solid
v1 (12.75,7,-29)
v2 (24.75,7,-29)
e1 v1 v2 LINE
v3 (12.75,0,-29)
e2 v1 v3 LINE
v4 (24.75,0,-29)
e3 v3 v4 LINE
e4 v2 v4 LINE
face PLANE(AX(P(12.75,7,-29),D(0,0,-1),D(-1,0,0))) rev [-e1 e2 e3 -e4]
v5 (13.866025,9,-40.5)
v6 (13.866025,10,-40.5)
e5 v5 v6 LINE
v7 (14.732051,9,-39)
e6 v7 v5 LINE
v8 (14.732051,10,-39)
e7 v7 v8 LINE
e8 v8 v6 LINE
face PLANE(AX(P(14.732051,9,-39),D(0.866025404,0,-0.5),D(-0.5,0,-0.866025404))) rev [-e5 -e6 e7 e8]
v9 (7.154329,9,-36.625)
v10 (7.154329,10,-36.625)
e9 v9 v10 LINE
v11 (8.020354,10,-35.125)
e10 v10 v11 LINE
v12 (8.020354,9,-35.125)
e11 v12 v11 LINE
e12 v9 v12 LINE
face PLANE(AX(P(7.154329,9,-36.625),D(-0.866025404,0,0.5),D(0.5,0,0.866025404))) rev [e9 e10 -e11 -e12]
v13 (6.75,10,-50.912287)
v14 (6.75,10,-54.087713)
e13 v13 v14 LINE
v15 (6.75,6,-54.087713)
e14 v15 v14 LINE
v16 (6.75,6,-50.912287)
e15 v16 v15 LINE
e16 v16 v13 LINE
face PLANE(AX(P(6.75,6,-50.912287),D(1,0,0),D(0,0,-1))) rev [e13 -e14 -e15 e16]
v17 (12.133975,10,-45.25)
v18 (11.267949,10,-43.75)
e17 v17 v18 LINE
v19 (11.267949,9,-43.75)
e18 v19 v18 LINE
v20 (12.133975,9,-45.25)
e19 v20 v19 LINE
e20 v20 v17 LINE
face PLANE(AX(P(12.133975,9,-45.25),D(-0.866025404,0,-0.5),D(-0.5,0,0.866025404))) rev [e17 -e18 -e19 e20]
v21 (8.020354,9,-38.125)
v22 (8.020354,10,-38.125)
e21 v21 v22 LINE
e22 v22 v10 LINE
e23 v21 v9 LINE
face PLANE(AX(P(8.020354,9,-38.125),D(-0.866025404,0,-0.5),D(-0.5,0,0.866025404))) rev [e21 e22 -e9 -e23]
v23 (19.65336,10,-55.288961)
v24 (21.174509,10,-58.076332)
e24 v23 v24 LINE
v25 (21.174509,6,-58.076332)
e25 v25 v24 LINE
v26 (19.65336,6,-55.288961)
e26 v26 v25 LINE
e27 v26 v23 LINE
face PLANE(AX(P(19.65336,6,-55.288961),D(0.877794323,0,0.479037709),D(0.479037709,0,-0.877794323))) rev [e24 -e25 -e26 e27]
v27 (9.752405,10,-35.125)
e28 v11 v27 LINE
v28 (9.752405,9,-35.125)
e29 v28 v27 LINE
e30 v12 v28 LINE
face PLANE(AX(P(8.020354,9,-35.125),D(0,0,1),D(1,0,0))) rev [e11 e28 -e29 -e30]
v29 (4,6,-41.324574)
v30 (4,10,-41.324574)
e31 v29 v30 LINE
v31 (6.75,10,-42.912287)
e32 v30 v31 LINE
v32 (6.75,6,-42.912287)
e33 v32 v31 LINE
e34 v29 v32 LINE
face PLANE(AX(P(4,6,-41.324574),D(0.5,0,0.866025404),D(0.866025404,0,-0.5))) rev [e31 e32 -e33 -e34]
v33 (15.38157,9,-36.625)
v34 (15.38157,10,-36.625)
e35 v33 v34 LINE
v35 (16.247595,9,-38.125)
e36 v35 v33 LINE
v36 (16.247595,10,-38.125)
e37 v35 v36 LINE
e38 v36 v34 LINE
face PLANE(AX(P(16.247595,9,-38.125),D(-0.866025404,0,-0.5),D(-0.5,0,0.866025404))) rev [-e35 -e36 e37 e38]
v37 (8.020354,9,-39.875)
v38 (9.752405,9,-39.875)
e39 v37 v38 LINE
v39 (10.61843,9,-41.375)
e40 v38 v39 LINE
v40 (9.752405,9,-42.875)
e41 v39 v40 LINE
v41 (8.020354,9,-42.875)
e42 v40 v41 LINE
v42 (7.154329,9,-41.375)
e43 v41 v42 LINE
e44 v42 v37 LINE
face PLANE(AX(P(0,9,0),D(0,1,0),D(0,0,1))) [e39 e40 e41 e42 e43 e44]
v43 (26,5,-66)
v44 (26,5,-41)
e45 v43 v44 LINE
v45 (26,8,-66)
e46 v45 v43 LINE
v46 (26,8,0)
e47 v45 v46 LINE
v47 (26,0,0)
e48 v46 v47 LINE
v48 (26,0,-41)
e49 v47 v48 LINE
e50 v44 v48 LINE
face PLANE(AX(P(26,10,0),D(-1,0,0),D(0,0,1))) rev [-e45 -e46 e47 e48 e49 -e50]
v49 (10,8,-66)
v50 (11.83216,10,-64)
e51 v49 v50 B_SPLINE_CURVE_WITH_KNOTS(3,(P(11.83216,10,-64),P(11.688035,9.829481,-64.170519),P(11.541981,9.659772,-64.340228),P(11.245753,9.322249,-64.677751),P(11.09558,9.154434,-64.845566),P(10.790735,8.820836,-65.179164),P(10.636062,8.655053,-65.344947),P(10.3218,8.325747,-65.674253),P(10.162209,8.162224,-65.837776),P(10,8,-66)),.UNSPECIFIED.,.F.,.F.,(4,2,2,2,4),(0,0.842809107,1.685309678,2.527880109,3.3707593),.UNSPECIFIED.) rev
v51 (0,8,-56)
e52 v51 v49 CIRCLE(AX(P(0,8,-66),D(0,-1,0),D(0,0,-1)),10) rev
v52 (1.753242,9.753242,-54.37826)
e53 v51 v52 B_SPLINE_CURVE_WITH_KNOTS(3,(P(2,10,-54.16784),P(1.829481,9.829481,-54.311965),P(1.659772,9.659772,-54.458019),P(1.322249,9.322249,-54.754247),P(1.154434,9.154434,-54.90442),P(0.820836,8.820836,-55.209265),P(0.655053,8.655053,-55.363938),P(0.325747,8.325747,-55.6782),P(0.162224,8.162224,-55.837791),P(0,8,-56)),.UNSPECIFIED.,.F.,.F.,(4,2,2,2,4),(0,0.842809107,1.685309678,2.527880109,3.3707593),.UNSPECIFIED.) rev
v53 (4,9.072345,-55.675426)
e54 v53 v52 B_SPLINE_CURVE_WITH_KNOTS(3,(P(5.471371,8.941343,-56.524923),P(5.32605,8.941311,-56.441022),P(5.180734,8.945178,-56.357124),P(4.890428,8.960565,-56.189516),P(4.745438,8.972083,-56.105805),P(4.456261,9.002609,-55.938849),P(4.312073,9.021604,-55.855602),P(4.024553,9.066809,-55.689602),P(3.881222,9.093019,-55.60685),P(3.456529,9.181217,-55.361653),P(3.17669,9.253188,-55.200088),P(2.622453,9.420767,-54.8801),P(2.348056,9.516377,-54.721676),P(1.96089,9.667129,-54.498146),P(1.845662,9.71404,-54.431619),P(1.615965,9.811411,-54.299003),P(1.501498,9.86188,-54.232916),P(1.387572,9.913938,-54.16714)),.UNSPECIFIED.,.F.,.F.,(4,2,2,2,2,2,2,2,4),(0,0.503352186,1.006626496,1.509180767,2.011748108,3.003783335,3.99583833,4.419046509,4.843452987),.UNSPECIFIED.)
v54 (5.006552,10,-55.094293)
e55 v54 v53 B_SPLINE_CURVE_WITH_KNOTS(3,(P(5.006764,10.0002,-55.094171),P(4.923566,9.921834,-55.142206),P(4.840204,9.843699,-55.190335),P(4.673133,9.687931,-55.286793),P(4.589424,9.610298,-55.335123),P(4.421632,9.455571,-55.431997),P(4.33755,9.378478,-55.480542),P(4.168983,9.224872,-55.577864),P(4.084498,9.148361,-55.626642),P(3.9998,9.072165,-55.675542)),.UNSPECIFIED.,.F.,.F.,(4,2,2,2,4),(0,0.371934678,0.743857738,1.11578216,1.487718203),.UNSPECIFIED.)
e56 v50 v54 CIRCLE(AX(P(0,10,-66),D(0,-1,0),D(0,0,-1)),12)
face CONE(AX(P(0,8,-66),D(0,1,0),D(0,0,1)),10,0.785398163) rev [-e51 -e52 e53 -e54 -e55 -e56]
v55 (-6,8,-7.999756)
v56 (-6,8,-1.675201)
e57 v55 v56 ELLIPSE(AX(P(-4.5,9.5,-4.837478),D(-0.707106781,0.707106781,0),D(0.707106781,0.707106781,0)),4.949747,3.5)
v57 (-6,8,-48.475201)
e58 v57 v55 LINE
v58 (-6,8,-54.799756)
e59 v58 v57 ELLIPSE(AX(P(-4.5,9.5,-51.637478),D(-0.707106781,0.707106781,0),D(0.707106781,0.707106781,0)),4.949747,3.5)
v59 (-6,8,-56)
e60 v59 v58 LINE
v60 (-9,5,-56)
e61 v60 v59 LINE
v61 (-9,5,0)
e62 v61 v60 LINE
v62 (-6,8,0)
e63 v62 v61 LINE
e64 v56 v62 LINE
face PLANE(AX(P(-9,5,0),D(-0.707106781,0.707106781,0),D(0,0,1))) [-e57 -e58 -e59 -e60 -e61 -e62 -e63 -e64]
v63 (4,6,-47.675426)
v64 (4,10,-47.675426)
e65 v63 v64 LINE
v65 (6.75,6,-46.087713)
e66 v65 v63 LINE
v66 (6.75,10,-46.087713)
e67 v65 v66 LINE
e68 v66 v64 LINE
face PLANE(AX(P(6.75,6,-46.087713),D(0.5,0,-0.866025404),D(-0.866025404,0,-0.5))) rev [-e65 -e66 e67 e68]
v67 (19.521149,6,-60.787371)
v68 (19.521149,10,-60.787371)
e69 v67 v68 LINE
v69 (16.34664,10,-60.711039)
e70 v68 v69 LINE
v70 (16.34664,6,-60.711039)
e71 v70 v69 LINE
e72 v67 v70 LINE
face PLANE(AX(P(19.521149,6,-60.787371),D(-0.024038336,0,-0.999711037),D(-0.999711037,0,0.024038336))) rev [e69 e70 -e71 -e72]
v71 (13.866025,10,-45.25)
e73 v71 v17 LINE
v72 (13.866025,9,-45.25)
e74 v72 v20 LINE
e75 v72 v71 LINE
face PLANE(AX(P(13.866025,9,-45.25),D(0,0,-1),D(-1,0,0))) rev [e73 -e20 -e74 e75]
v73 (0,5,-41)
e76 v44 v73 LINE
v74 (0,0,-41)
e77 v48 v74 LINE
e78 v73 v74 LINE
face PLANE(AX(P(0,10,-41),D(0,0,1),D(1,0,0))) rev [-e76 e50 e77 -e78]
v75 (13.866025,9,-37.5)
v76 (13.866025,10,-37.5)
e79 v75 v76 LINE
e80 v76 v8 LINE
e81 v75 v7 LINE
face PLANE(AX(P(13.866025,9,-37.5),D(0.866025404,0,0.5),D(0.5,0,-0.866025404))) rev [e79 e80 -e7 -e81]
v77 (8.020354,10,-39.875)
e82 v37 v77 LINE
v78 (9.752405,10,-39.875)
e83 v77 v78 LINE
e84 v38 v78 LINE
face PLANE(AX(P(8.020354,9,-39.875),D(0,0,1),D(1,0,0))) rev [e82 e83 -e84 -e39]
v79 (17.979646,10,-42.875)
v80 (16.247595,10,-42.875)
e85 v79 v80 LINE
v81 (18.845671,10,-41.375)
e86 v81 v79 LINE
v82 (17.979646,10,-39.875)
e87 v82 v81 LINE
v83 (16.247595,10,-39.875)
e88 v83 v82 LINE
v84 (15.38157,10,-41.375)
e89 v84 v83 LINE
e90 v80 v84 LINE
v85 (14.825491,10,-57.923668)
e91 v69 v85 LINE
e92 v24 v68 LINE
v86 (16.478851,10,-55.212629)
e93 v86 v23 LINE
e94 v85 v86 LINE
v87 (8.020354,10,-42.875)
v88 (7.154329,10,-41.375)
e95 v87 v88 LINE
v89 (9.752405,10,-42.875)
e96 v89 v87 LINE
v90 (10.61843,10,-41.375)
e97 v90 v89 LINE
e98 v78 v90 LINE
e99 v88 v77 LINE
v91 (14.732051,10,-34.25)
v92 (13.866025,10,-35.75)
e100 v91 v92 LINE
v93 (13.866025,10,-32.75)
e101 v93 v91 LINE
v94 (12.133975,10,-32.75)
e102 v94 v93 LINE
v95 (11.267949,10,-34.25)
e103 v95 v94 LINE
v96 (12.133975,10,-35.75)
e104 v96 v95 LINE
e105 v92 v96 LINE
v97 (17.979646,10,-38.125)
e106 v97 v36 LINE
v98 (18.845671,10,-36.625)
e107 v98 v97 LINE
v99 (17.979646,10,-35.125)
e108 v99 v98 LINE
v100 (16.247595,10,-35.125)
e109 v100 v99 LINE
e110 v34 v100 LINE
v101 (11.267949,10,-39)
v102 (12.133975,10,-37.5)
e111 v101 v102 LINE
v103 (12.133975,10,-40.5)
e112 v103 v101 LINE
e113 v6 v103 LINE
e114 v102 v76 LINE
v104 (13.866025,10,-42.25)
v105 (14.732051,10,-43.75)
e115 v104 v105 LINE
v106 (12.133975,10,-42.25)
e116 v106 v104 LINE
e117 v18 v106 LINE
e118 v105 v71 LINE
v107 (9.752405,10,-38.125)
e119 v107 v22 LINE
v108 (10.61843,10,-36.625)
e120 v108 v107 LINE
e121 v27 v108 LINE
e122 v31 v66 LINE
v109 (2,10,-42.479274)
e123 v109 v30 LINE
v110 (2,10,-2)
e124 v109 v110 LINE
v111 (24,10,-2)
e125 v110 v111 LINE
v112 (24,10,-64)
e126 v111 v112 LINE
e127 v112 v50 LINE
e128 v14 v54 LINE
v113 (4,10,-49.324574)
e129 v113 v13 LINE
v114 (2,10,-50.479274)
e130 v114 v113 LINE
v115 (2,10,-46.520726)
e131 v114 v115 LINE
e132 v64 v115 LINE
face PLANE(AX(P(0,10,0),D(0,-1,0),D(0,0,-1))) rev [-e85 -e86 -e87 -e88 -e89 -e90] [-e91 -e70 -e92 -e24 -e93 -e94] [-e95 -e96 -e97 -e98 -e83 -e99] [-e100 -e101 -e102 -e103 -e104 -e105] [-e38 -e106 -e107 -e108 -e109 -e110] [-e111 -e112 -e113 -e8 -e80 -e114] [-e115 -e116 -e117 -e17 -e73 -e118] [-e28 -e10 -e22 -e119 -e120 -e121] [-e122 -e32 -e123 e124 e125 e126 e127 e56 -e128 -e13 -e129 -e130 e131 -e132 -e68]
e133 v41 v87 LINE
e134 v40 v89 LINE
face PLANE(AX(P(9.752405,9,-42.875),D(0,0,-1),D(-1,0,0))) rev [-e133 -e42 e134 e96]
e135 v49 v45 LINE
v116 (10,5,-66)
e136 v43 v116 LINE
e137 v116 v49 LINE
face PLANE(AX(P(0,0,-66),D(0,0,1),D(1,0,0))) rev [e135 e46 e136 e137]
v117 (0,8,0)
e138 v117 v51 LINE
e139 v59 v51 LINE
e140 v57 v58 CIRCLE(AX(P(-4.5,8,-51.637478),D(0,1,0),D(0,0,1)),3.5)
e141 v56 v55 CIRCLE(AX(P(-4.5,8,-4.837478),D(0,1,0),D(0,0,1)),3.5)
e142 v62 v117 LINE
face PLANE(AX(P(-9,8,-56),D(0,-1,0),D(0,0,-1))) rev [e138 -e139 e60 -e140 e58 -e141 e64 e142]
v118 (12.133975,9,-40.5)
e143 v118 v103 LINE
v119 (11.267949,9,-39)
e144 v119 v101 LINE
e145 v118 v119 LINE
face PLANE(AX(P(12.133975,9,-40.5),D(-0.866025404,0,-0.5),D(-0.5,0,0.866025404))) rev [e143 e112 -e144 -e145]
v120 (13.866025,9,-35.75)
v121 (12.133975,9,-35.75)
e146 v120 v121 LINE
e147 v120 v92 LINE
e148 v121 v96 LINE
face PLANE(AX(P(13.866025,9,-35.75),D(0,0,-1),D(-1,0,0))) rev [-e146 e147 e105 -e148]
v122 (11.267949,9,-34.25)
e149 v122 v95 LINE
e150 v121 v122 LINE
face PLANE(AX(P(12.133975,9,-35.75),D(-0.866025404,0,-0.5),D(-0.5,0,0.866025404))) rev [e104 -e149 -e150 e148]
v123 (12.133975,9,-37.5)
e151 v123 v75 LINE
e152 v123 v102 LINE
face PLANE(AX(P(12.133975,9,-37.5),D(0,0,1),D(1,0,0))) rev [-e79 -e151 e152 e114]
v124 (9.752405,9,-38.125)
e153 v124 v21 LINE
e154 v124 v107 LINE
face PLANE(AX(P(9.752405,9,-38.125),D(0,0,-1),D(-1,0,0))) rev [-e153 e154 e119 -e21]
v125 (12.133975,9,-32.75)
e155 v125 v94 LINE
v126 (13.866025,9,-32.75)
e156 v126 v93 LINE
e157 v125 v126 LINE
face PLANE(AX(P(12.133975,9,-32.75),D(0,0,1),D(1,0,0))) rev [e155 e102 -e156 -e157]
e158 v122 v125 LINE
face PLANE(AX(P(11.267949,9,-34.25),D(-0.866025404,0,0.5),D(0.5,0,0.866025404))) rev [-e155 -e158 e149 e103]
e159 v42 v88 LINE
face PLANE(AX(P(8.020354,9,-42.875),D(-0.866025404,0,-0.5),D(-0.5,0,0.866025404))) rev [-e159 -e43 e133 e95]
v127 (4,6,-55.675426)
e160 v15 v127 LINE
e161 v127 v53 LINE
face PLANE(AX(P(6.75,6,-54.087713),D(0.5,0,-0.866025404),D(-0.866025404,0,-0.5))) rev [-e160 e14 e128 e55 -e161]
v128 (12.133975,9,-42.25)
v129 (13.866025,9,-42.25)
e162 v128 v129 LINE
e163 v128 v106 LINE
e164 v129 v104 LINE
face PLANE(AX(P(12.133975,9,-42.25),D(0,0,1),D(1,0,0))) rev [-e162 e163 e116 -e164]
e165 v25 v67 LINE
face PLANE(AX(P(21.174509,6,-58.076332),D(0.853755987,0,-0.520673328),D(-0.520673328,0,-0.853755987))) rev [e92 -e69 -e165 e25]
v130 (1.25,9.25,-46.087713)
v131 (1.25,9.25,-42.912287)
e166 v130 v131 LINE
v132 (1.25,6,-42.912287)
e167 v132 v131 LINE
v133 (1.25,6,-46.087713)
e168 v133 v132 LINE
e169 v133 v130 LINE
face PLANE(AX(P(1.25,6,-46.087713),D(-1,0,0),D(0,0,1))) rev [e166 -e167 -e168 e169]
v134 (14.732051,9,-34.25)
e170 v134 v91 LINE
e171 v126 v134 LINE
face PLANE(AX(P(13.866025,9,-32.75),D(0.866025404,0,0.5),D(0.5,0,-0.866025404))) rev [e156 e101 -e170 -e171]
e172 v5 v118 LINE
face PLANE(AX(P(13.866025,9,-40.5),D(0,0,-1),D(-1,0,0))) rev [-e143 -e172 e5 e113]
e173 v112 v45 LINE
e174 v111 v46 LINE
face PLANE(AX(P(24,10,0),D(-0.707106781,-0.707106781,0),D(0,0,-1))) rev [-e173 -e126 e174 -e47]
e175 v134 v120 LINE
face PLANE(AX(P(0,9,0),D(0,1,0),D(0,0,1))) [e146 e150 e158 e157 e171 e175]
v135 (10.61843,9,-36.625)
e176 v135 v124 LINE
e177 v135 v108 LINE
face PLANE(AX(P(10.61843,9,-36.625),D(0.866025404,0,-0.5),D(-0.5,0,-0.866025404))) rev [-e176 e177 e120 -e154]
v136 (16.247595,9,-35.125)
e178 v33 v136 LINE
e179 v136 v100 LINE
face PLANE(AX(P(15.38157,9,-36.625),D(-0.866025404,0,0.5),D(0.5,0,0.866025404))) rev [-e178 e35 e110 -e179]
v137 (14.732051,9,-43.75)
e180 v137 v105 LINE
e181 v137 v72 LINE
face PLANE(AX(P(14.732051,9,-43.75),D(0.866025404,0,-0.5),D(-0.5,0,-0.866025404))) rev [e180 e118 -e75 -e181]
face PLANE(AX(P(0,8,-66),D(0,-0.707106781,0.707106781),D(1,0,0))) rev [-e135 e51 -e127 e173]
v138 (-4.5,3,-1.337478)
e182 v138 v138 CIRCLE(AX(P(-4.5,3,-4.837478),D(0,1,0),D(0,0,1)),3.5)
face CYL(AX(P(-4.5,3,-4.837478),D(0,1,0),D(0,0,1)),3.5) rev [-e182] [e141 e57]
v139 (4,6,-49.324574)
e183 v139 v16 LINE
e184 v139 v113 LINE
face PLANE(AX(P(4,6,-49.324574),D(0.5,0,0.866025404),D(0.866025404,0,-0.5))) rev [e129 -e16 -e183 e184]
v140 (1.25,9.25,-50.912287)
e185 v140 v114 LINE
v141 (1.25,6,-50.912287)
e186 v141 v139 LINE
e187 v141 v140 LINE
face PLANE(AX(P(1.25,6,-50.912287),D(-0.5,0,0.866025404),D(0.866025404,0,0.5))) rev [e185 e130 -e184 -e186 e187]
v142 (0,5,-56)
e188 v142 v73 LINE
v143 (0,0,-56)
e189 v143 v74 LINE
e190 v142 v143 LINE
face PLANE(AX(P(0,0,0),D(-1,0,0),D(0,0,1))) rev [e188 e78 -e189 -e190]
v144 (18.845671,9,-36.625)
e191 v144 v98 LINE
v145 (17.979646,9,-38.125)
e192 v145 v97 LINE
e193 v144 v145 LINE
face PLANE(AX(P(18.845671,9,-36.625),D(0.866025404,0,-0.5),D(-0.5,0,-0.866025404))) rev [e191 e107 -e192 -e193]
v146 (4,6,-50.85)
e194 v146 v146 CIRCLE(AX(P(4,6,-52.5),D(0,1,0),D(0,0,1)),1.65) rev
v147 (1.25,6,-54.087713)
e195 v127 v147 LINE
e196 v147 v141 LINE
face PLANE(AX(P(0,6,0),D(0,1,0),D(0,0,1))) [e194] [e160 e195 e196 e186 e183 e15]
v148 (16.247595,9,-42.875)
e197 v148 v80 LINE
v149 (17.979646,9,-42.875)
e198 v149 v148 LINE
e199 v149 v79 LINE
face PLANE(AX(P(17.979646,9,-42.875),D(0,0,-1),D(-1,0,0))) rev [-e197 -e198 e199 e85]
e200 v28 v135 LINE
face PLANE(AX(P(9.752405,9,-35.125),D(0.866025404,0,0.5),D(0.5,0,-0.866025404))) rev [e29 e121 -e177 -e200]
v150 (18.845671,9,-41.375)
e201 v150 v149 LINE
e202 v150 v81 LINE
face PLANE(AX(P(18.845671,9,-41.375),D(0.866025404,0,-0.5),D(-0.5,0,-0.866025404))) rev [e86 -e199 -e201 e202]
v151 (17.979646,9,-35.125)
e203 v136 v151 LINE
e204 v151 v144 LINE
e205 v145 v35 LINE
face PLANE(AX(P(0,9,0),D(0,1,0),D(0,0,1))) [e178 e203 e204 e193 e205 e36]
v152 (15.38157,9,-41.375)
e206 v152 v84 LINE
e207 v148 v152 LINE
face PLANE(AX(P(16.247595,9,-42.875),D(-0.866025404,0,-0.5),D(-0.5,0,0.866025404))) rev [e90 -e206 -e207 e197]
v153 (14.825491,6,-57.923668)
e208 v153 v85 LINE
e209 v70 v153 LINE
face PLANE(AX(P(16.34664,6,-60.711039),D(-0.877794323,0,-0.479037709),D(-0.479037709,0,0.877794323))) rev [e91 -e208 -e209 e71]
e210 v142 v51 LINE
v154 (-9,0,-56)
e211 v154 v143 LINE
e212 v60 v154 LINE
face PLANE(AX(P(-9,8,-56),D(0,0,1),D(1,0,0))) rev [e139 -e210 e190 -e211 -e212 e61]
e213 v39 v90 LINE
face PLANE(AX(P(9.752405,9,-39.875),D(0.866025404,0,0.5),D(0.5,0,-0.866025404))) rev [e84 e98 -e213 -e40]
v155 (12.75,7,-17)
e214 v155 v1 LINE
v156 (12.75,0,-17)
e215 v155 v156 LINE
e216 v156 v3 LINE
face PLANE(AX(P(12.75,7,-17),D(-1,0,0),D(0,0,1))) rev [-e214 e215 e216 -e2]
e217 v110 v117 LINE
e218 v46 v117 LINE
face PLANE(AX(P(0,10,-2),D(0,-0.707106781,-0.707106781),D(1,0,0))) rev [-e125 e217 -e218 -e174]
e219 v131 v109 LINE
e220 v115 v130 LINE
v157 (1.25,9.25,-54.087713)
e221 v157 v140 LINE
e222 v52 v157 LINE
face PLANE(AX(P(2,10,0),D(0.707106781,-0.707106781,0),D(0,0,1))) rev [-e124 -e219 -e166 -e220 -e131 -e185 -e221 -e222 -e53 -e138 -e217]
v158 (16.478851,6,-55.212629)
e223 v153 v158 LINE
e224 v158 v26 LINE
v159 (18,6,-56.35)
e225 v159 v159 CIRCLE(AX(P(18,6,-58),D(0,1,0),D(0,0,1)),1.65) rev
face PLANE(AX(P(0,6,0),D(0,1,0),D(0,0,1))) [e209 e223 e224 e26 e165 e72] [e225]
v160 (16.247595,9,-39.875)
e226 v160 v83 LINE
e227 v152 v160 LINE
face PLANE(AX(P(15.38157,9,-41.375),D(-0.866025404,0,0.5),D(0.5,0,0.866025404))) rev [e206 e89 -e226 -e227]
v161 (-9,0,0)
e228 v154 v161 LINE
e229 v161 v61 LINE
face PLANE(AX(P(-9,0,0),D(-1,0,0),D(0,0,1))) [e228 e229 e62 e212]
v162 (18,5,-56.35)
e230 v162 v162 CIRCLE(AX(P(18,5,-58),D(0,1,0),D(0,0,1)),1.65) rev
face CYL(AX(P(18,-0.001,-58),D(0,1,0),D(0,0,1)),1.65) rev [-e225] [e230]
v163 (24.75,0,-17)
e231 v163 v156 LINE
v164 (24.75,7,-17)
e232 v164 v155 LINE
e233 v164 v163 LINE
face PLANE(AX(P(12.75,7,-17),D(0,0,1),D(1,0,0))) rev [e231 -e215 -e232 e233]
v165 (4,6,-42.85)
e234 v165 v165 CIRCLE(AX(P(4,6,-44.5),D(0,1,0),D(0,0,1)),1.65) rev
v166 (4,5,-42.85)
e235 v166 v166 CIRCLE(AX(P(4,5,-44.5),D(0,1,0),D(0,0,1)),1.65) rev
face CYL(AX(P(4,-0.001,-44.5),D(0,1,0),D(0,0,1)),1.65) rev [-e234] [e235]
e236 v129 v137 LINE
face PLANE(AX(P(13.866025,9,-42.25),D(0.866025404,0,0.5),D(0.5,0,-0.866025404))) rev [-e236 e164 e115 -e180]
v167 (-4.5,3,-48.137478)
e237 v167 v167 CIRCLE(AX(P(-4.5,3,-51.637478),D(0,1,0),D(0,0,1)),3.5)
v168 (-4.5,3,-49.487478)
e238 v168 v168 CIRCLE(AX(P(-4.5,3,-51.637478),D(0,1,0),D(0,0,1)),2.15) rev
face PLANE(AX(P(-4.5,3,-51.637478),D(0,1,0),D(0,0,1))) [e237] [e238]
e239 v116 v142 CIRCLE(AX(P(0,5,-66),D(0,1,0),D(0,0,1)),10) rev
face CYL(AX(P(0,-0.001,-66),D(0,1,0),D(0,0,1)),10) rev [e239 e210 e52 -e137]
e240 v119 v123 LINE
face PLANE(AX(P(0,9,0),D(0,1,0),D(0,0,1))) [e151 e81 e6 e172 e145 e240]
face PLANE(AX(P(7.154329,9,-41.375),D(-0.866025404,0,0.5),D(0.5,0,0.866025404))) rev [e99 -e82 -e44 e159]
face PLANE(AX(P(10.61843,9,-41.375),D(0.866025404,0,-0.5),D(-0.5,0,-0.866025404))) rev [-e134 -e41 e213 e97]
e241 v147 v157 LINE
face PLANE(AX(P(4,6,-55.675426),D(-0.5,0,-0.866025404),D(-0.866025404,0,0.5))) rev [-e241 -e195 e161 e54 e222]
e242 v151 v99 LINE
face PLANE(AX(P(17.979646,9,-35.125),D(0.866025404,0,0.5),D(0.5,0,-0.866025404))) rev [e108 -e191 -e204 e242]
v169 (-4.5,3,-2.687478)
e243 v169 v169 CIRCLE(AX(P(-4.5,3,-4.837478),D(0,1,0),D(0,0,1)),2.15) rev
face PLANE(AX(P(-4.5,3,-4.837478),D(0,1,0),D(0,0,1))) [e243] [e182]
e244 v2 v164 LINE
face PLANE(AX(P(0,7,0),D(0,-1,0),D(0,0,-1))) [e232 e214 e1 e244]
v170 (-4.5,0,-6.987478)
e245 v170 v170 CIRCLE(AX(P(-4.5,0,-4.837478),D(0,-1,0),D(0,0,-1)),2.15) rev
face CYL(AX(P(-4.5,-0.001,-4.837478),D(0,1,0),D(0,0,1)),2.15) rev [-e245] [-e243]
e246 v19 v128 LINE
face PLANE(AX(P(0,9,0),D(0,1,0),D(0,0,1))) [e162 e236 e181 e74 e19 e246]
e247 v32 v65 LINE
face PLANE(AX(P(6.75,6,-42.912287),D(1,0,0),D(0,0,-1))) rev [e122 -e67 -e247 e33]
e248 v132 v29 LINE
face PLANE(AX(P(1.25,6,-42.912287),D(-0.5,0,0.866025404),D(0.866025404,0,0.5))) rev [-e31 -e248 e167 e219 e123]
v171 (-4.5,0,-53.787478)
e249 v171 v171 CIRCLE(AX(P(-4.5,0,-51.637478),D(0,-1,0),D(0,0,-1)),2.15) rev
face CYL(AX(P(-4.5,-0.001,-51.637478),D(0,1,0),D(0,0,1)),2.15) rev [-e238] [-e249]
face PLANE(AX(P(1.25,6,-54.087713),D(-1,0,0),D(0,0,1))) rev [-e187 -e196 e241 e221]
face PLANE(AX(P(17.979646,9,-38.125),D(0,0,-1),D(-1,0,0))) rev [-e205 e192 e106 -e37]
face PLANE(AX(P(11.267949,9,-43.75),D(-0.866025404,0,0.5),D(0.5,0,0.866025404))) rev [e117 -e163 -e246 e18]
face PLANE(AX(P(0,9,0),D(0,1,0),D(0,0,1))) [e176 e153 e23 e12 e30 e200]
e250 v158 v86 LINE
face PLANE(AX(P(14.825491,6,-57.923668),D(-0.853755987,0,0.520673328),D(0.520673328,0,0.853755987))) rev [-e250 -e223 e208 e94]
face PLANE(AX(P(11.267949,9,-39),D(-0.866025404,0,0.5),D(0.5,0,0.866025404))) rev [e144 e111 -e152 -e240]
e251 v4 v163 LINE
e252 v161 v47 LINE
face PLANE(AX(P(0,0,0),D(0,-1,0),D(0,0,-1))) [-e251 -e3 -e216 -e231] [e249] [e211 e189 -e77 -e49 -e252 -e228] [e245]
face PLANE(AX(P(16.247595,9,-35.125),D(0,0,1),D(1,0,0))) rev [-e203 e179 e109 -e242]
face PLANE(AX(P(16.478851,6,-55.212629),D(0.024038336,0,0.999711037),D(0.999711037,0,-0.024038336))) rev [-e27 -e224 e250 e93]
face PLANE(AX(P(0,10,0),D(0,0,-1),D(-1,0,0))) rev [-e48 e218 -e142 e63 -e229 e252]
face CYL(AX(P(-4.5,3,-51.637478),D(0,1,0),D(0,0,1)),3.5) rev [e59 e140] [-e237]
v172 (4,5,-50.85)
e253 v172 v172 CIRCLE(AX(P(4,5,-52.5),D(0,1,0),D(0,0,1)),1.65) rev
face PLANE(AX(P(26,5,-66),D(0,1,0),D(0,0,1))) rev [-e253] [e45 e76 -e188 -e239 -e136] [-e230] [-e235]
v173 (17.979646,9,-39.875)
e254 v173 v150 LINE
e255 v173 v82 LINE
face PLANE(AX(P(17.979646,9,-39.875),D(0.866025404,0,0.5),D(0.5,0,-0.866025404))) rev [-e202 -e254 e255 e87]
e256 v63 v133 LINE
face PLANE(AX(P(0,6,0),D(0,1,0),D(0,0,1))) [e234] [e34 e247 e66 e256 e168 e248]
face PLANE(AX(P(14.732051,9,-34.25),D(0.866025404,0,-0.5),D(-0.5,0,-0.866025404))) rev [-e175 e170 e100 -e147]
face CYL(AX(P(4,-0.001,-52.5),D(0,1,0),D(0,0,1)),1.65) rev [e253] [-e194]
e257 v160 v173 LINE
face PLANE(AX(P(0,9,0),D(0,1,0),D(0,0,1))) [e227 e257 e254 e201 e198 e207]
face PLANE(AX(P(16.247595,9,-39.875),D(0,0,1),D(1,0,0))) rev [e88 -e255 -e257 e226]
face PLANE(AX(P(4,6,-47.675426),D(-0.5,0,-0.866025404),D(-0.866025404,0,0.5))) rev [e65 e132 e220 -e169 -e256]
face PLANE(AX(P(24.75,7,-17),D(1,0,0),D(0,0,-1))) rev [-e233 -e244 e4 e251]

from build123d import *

# Parameters (mm, degrees)
SKETCH1_W           = 26
SKETCH1_H           = 41
BOSS_EXTRUDE1_DEPTH = 10
SKETCH2_W           = 26
SKETCH2_H           = 5
BOSS_EXTRUDE2_DEPTH = 25
CUT_EXTRUDE1_REACH  = 73.638
CHAMFER1_SIZE       = 2
SKETCH4_W           = 56
SKETCH4_H           = 8
BOSS_EXTRUDE3_DEPTH = 9
CUT_EXTRUDE2_REACH  = 73.386
SKETCH5_R           = 2.15
SKETCH6_R           = 3.5
CUT_EXTRUDE3_DEPTH  = 5
CHAMFER3_SIZE       = 3
CUT_EXTRUDE5_DEPTH  = 1
CUT_EXTRUDE6_DEPTH  = 4
CUT_EXTRUDE7_REACH  = 73.638
SKETCH12_R          = 1.65
SKETCH14_W          = 12
SKETCH14_H          = 12
CUT_EXTRUDE9_DEPTH  = 7


with BuildPart() as part:
    # Sketch1 → Boss-Extrude1 (new body)
    with BuildSketch(Plane(origin=(0, 0, 0), x_dir=(1, 0, 0), z_dir=(0, 1, 0))):
        with Locations((13, 20.5)):
            Rectangle(SKETCH1_W, SKETCH1_H)
    extrude(amount=BOSS_EXTRUDE1_DEPTH)

    # Sketch2 → Boss-Extrude2 (add)
    with BuildSketch(Plane(origin=(0, 0, -41), x_dir=(-1, 0, 0), z_dir=(0, 0, -1))):
        with Locations((-13, 7.5)):
            Rectangle(SKETCH2_W, SKETCH2_H)
    extrude(amount=BOSS_EXTRUDE2_DEPTH)

    # Sketch3 → Cut-Extrude1 (cut, up to next)
    with BuildSketch(Plane(origin=(0, 10, 0), x_dir=(1, 0, 0), z_dir=(0, 1, 0)), mode=Mode.PRIVATE) as cut_extrude1_sk1:
        with BuildLine():
            Line((0, 56), (0, 66))
            Line((0, 66), (10, 66))
            ThreePointArc((10, 66), (7.071067812, 58.928932188), (0, 56))
        make_face()
    cut_extrude1_tool1 = extrude(cut_extrude1_sk1.sketch, amount=-CUT_EXTRUDE1_REACH, mode=Mode.PRIVATE) & part.part
    add(cut_extrude1_tool1.solids().sort_by_distance((4.244132, 10, -61.755868))[0], mode=Mode.SUBTRACT)

    # Chamfer1
    chamfer1_edges = [part.edges().sort_by_distance(p)[0] for p in [
        (26, 10, -33),
        (18, 10, -66),
        (0, 10, -28),
        (7.071067812, 10, -58.928932188),
        (13, 10, 0),
    ]]
    chamfer(chamfer1_edges, length=CHAMFER1_SIZE)

    # Sketch4 → Boss-Extrude3 (add)
    with BuildSketch(Plane.ZY):
        with Locations((-28, 4)):
            Rectangle(SKETCH4_W, SKETCH4_H)
    extrude(amount=BOSS_EXTRUDE3_DEPTH)

    # Sketch5 → Cut-Extrude2 (cut, up to next)
    with BuildSketch(Plane(origin=(0, 8, 0), x_dir=(1, 0, 0), z_dir=(0, 1, 0)), mode=Mode.PRIVATE) as cut_extrude2_sk1:
        with Locations(Location((-4.5, 51.637478231, 0), (0, 0, 270))):
            Circle(SKETCH5_R)
    cut_extrude2_tool1 = extrude(cut_extrude2_sk1.sketch, amount=-CUT_EXTRUDE2_REACH, mode=Mode.PRIVATE) & part.part
    # Sketch5 → Cut-Extrude2 (cut, up to next)
    with BuildSketch(Plane(origin=(0, 8, 0), x_dir=(1, 0, 0), z_dir=(0, 1, 0)), mode=Mode.PRIVATE) as cut_extrude2_sk2:
        with Locations(Location((-4.5, 4.837478231, 0), (0, 0, 270))):
            Circle(SKETCH5_R)
    cut_extrude2_tool2 = extrude(cut_extrude2_sk2.sketch, amount=-CUT_EXTRUDE2_REACH, mode=Mode.PRIVATE) & part.part
    add(cut_extrude2_tool1.solids().sort_by_distance((-4.5, 8, -51.637478))[0], mode=Mode.SUBTRACT)
    add(cut_extrude2_tool2.solids().sort_by_distance((-4.5, 8, -4.837478))[0], mode=Mode.SUBTRACT)

    # Sketch6 → Cut-Extrude3 (cut)
    with BuildSketch(Plane(origin=(0, 8, 0), x_dir=(1, 0, 0), z_dir=(0, 1, 0))):
        with Locations(Location((-4.5, 51.637478231, 0), (0, 0, 270))):
            Circle(SKETCH6_R)
        with Locations(Location((-4.5, 4.837478231, 0), (0, 0, 270))):
            Circle(SKETCH6_R)
    extrude(amount=-CUT_EXTRUDE3_DEPTH, mode=Mode.SUBTRACT)

    # Chamfer3
    # the kernel refuses this chamfer: 3 mm, written as the material it takes off along each edge
    with BuildSketch(Plane(origin=(-9, 8, -63.715048964), x_dir=(-0.0274958766105862, -0.9996219169112968, 0), z_dir=(0, 0, 1))) as chamfer3_piece_1:
        Polygon((CHAMFER3_SIZE * 0.999621916911, CHAMFER3_SIZE * 0.0274958766106), (-CHAMFER3_SIZE * 0.0274958766106, CHAMFER3_SIZE * 0.999621916911), (0, 0), align=None)
    extrude(amount=71.430097928, mode=Mode.SUBTRACT)

    # Sketch10 → Cut-Extrude5 (cut)
    with BuildSketch(Plane(origin=(0, 10, 0), x_dir=(1, 0, 0), z_dir=(0, 1, 0))):
        Polygon((14.732050808, 39), (13.866025404, 40.5), (12.133974596, 40.5), (11.267949192, 39), (12.133974596, 37.5), (13.866025404, 37.5), align=None)
        Polygon((14.732050808, 43.75), (13.866025404, 45.25), (12.133974596, 45.25), (11.267949192, 43.75), (12.133974596, 42.25), (13.866025404, 42.25), align=None)
        Polygon((17.979646072, 39.875), (18.845671476, 41.375), (17.979646072, 42.875), (16.247595264, 42.875), (15.38156986, 41.375), (16.247595264, 39.875), align=None)
        Polygon((16.247595264, 35.125), (17.979646072, 35.125), (18.845671476, 36.625), (17.979646072, 38.125), (16.247595264, 38.125), (15.38156986, 36.625), align=None)
        Polygon((11.267949192, 34.25), (12.133974596, 32.75), (13.866025404, 32.75), (14.732050808, 34.25), (13.866025404, 35.75), (12.133974596, 35.75), align=None)
        Polygon((8.020353928, 38.125), (7.154328524, 36.625), (8.020353928, 35.125), (9.752404736, 35.125), (10.61843014, 36.625), (9.752404736, 38.125), align=None)
        Polygon((9.752404736, 42.875), (8.020353928, 42.875), (7.154328524, 41.375), (8.020353928, 39.875), (9.752404736, 39.875), (10.61843014, 41.375), align=None)
    extrude(amount=-CUT_EXTRUDE5_DEPTH, mode=Mode.SUBTRACT)

    # Sketch11 → Cut-Extrude6 (cut)
    with BuildSketch(Plane(origin=(0, 10, 0), x_dir=(1, 0, 0), z_dir=(0, 1, 0))):
        Polygon((6.75, 46.08771324), (4, 47.675426481), (1.25, 46.08771324), (1.25, 42.91228676), (4, 41.324573519), (6.75, 42.91228676), align=None)
        Polygon((6.75, 54.08771324), (4, 55.675426481), (1.25, 54.08771324), (1.25, 50.91228676), (4, 49.324573519), (6.75, 50.91228676), align=None)
        Polygon((21.174508901, 58.076331968), (19.521149027, 60.787371337), (16.346640126, 60.711039369), (14.825491099, 57.923668032), (16.478850973, 55.212628663), (19.653359874, 55.288960631), align=None)
    extrude(amount=-CUT_EXTRUDE6_DEPTH, mode=Mode.SUBTRACT)

    # Sketch12 → Cut-Extrude7 (cut, up to next)
    with BuildSketch(Plane(origin=(0, 10, 0), x_dir=(1, 0, 0), z_dir=(0, 1, 0)), mode=Mode.PRIVATE) as cut_extrude7_sk1:
        with Locations(Location((4, 52.5, 0), (0, 0, 270))):
            Circle(SKETCH12_R)
    cut_extrude7_tool1 = extrude(cut_extrude7_sk1.sketch, amount=-CUT_EXTRUDE7_REACH, mode=Mode.PRIVATE) & part.part
    # Sketch12 → Cut-Extrude7 (cut, up to next)
    with BuildSketch(Plane(origin=(0, 10, 0), x_dir=(1, 0, 0), z_dir=(0, 1, 0)), mode=Mode.PRIVATE) as cut_extrude7_sk2:
        with Locations(Location((4, 44.5, 0), (0, 0, 270))):
            Circle(SKETCH12_R)
    cut_extrude7_tool2 = extrude(cut_extrude7_sk2.sketch, amount=-CUT_EXTRUDE7_REACH, mode=Mode.PRIVATE) & part.part
    # Sketch12 → Cut-Extrude7 (cut, up to next)
    with BuildSketch(Plane(origin=(0, 10, 0), x_dir=(1, 0, 0), z_dir=(0, 1, 0)), mode=Mode.PRIVATE) as cut_extrude7_sk3:
        with Locations(Location((18, 58, 0), (0, 0, 270))):
            Circle(SKETCH12_R)
    cut_extrude7_tool3 = extrude(cut_extrude7_sk3.sketch, amount=-CUT_EXTRUDE7_REACH, mode=Mode.PRIVATE) & part.part
    add(cut_extrude7_tool1.solids().sort_by_distance((4, 10, -52.5))[0], mode=Mode.SUBTRACT)
    add(cut_extrude7_tool2.solids().sort_by_distance((4, 10, -44.5))[0], mode=Mode.SUBTRACT)
    add(cut_extrude7_tool3.solids().sort_by_distance((18, 10, -58))[0], mode=Mode.SUBTRACT)

    # Sketch14 → Cut-Extrude9 (cut)
    with BuildSketch(Plane.XZ):
        with Locations((18.75, -23)):
            Rectangle(SKETCH14_W, SKETCH14_H)
    extrude(amount=-CUT_EXTRUDE9_DEPTH, mode=Mode.SUBTRACT)


solid = part.part
